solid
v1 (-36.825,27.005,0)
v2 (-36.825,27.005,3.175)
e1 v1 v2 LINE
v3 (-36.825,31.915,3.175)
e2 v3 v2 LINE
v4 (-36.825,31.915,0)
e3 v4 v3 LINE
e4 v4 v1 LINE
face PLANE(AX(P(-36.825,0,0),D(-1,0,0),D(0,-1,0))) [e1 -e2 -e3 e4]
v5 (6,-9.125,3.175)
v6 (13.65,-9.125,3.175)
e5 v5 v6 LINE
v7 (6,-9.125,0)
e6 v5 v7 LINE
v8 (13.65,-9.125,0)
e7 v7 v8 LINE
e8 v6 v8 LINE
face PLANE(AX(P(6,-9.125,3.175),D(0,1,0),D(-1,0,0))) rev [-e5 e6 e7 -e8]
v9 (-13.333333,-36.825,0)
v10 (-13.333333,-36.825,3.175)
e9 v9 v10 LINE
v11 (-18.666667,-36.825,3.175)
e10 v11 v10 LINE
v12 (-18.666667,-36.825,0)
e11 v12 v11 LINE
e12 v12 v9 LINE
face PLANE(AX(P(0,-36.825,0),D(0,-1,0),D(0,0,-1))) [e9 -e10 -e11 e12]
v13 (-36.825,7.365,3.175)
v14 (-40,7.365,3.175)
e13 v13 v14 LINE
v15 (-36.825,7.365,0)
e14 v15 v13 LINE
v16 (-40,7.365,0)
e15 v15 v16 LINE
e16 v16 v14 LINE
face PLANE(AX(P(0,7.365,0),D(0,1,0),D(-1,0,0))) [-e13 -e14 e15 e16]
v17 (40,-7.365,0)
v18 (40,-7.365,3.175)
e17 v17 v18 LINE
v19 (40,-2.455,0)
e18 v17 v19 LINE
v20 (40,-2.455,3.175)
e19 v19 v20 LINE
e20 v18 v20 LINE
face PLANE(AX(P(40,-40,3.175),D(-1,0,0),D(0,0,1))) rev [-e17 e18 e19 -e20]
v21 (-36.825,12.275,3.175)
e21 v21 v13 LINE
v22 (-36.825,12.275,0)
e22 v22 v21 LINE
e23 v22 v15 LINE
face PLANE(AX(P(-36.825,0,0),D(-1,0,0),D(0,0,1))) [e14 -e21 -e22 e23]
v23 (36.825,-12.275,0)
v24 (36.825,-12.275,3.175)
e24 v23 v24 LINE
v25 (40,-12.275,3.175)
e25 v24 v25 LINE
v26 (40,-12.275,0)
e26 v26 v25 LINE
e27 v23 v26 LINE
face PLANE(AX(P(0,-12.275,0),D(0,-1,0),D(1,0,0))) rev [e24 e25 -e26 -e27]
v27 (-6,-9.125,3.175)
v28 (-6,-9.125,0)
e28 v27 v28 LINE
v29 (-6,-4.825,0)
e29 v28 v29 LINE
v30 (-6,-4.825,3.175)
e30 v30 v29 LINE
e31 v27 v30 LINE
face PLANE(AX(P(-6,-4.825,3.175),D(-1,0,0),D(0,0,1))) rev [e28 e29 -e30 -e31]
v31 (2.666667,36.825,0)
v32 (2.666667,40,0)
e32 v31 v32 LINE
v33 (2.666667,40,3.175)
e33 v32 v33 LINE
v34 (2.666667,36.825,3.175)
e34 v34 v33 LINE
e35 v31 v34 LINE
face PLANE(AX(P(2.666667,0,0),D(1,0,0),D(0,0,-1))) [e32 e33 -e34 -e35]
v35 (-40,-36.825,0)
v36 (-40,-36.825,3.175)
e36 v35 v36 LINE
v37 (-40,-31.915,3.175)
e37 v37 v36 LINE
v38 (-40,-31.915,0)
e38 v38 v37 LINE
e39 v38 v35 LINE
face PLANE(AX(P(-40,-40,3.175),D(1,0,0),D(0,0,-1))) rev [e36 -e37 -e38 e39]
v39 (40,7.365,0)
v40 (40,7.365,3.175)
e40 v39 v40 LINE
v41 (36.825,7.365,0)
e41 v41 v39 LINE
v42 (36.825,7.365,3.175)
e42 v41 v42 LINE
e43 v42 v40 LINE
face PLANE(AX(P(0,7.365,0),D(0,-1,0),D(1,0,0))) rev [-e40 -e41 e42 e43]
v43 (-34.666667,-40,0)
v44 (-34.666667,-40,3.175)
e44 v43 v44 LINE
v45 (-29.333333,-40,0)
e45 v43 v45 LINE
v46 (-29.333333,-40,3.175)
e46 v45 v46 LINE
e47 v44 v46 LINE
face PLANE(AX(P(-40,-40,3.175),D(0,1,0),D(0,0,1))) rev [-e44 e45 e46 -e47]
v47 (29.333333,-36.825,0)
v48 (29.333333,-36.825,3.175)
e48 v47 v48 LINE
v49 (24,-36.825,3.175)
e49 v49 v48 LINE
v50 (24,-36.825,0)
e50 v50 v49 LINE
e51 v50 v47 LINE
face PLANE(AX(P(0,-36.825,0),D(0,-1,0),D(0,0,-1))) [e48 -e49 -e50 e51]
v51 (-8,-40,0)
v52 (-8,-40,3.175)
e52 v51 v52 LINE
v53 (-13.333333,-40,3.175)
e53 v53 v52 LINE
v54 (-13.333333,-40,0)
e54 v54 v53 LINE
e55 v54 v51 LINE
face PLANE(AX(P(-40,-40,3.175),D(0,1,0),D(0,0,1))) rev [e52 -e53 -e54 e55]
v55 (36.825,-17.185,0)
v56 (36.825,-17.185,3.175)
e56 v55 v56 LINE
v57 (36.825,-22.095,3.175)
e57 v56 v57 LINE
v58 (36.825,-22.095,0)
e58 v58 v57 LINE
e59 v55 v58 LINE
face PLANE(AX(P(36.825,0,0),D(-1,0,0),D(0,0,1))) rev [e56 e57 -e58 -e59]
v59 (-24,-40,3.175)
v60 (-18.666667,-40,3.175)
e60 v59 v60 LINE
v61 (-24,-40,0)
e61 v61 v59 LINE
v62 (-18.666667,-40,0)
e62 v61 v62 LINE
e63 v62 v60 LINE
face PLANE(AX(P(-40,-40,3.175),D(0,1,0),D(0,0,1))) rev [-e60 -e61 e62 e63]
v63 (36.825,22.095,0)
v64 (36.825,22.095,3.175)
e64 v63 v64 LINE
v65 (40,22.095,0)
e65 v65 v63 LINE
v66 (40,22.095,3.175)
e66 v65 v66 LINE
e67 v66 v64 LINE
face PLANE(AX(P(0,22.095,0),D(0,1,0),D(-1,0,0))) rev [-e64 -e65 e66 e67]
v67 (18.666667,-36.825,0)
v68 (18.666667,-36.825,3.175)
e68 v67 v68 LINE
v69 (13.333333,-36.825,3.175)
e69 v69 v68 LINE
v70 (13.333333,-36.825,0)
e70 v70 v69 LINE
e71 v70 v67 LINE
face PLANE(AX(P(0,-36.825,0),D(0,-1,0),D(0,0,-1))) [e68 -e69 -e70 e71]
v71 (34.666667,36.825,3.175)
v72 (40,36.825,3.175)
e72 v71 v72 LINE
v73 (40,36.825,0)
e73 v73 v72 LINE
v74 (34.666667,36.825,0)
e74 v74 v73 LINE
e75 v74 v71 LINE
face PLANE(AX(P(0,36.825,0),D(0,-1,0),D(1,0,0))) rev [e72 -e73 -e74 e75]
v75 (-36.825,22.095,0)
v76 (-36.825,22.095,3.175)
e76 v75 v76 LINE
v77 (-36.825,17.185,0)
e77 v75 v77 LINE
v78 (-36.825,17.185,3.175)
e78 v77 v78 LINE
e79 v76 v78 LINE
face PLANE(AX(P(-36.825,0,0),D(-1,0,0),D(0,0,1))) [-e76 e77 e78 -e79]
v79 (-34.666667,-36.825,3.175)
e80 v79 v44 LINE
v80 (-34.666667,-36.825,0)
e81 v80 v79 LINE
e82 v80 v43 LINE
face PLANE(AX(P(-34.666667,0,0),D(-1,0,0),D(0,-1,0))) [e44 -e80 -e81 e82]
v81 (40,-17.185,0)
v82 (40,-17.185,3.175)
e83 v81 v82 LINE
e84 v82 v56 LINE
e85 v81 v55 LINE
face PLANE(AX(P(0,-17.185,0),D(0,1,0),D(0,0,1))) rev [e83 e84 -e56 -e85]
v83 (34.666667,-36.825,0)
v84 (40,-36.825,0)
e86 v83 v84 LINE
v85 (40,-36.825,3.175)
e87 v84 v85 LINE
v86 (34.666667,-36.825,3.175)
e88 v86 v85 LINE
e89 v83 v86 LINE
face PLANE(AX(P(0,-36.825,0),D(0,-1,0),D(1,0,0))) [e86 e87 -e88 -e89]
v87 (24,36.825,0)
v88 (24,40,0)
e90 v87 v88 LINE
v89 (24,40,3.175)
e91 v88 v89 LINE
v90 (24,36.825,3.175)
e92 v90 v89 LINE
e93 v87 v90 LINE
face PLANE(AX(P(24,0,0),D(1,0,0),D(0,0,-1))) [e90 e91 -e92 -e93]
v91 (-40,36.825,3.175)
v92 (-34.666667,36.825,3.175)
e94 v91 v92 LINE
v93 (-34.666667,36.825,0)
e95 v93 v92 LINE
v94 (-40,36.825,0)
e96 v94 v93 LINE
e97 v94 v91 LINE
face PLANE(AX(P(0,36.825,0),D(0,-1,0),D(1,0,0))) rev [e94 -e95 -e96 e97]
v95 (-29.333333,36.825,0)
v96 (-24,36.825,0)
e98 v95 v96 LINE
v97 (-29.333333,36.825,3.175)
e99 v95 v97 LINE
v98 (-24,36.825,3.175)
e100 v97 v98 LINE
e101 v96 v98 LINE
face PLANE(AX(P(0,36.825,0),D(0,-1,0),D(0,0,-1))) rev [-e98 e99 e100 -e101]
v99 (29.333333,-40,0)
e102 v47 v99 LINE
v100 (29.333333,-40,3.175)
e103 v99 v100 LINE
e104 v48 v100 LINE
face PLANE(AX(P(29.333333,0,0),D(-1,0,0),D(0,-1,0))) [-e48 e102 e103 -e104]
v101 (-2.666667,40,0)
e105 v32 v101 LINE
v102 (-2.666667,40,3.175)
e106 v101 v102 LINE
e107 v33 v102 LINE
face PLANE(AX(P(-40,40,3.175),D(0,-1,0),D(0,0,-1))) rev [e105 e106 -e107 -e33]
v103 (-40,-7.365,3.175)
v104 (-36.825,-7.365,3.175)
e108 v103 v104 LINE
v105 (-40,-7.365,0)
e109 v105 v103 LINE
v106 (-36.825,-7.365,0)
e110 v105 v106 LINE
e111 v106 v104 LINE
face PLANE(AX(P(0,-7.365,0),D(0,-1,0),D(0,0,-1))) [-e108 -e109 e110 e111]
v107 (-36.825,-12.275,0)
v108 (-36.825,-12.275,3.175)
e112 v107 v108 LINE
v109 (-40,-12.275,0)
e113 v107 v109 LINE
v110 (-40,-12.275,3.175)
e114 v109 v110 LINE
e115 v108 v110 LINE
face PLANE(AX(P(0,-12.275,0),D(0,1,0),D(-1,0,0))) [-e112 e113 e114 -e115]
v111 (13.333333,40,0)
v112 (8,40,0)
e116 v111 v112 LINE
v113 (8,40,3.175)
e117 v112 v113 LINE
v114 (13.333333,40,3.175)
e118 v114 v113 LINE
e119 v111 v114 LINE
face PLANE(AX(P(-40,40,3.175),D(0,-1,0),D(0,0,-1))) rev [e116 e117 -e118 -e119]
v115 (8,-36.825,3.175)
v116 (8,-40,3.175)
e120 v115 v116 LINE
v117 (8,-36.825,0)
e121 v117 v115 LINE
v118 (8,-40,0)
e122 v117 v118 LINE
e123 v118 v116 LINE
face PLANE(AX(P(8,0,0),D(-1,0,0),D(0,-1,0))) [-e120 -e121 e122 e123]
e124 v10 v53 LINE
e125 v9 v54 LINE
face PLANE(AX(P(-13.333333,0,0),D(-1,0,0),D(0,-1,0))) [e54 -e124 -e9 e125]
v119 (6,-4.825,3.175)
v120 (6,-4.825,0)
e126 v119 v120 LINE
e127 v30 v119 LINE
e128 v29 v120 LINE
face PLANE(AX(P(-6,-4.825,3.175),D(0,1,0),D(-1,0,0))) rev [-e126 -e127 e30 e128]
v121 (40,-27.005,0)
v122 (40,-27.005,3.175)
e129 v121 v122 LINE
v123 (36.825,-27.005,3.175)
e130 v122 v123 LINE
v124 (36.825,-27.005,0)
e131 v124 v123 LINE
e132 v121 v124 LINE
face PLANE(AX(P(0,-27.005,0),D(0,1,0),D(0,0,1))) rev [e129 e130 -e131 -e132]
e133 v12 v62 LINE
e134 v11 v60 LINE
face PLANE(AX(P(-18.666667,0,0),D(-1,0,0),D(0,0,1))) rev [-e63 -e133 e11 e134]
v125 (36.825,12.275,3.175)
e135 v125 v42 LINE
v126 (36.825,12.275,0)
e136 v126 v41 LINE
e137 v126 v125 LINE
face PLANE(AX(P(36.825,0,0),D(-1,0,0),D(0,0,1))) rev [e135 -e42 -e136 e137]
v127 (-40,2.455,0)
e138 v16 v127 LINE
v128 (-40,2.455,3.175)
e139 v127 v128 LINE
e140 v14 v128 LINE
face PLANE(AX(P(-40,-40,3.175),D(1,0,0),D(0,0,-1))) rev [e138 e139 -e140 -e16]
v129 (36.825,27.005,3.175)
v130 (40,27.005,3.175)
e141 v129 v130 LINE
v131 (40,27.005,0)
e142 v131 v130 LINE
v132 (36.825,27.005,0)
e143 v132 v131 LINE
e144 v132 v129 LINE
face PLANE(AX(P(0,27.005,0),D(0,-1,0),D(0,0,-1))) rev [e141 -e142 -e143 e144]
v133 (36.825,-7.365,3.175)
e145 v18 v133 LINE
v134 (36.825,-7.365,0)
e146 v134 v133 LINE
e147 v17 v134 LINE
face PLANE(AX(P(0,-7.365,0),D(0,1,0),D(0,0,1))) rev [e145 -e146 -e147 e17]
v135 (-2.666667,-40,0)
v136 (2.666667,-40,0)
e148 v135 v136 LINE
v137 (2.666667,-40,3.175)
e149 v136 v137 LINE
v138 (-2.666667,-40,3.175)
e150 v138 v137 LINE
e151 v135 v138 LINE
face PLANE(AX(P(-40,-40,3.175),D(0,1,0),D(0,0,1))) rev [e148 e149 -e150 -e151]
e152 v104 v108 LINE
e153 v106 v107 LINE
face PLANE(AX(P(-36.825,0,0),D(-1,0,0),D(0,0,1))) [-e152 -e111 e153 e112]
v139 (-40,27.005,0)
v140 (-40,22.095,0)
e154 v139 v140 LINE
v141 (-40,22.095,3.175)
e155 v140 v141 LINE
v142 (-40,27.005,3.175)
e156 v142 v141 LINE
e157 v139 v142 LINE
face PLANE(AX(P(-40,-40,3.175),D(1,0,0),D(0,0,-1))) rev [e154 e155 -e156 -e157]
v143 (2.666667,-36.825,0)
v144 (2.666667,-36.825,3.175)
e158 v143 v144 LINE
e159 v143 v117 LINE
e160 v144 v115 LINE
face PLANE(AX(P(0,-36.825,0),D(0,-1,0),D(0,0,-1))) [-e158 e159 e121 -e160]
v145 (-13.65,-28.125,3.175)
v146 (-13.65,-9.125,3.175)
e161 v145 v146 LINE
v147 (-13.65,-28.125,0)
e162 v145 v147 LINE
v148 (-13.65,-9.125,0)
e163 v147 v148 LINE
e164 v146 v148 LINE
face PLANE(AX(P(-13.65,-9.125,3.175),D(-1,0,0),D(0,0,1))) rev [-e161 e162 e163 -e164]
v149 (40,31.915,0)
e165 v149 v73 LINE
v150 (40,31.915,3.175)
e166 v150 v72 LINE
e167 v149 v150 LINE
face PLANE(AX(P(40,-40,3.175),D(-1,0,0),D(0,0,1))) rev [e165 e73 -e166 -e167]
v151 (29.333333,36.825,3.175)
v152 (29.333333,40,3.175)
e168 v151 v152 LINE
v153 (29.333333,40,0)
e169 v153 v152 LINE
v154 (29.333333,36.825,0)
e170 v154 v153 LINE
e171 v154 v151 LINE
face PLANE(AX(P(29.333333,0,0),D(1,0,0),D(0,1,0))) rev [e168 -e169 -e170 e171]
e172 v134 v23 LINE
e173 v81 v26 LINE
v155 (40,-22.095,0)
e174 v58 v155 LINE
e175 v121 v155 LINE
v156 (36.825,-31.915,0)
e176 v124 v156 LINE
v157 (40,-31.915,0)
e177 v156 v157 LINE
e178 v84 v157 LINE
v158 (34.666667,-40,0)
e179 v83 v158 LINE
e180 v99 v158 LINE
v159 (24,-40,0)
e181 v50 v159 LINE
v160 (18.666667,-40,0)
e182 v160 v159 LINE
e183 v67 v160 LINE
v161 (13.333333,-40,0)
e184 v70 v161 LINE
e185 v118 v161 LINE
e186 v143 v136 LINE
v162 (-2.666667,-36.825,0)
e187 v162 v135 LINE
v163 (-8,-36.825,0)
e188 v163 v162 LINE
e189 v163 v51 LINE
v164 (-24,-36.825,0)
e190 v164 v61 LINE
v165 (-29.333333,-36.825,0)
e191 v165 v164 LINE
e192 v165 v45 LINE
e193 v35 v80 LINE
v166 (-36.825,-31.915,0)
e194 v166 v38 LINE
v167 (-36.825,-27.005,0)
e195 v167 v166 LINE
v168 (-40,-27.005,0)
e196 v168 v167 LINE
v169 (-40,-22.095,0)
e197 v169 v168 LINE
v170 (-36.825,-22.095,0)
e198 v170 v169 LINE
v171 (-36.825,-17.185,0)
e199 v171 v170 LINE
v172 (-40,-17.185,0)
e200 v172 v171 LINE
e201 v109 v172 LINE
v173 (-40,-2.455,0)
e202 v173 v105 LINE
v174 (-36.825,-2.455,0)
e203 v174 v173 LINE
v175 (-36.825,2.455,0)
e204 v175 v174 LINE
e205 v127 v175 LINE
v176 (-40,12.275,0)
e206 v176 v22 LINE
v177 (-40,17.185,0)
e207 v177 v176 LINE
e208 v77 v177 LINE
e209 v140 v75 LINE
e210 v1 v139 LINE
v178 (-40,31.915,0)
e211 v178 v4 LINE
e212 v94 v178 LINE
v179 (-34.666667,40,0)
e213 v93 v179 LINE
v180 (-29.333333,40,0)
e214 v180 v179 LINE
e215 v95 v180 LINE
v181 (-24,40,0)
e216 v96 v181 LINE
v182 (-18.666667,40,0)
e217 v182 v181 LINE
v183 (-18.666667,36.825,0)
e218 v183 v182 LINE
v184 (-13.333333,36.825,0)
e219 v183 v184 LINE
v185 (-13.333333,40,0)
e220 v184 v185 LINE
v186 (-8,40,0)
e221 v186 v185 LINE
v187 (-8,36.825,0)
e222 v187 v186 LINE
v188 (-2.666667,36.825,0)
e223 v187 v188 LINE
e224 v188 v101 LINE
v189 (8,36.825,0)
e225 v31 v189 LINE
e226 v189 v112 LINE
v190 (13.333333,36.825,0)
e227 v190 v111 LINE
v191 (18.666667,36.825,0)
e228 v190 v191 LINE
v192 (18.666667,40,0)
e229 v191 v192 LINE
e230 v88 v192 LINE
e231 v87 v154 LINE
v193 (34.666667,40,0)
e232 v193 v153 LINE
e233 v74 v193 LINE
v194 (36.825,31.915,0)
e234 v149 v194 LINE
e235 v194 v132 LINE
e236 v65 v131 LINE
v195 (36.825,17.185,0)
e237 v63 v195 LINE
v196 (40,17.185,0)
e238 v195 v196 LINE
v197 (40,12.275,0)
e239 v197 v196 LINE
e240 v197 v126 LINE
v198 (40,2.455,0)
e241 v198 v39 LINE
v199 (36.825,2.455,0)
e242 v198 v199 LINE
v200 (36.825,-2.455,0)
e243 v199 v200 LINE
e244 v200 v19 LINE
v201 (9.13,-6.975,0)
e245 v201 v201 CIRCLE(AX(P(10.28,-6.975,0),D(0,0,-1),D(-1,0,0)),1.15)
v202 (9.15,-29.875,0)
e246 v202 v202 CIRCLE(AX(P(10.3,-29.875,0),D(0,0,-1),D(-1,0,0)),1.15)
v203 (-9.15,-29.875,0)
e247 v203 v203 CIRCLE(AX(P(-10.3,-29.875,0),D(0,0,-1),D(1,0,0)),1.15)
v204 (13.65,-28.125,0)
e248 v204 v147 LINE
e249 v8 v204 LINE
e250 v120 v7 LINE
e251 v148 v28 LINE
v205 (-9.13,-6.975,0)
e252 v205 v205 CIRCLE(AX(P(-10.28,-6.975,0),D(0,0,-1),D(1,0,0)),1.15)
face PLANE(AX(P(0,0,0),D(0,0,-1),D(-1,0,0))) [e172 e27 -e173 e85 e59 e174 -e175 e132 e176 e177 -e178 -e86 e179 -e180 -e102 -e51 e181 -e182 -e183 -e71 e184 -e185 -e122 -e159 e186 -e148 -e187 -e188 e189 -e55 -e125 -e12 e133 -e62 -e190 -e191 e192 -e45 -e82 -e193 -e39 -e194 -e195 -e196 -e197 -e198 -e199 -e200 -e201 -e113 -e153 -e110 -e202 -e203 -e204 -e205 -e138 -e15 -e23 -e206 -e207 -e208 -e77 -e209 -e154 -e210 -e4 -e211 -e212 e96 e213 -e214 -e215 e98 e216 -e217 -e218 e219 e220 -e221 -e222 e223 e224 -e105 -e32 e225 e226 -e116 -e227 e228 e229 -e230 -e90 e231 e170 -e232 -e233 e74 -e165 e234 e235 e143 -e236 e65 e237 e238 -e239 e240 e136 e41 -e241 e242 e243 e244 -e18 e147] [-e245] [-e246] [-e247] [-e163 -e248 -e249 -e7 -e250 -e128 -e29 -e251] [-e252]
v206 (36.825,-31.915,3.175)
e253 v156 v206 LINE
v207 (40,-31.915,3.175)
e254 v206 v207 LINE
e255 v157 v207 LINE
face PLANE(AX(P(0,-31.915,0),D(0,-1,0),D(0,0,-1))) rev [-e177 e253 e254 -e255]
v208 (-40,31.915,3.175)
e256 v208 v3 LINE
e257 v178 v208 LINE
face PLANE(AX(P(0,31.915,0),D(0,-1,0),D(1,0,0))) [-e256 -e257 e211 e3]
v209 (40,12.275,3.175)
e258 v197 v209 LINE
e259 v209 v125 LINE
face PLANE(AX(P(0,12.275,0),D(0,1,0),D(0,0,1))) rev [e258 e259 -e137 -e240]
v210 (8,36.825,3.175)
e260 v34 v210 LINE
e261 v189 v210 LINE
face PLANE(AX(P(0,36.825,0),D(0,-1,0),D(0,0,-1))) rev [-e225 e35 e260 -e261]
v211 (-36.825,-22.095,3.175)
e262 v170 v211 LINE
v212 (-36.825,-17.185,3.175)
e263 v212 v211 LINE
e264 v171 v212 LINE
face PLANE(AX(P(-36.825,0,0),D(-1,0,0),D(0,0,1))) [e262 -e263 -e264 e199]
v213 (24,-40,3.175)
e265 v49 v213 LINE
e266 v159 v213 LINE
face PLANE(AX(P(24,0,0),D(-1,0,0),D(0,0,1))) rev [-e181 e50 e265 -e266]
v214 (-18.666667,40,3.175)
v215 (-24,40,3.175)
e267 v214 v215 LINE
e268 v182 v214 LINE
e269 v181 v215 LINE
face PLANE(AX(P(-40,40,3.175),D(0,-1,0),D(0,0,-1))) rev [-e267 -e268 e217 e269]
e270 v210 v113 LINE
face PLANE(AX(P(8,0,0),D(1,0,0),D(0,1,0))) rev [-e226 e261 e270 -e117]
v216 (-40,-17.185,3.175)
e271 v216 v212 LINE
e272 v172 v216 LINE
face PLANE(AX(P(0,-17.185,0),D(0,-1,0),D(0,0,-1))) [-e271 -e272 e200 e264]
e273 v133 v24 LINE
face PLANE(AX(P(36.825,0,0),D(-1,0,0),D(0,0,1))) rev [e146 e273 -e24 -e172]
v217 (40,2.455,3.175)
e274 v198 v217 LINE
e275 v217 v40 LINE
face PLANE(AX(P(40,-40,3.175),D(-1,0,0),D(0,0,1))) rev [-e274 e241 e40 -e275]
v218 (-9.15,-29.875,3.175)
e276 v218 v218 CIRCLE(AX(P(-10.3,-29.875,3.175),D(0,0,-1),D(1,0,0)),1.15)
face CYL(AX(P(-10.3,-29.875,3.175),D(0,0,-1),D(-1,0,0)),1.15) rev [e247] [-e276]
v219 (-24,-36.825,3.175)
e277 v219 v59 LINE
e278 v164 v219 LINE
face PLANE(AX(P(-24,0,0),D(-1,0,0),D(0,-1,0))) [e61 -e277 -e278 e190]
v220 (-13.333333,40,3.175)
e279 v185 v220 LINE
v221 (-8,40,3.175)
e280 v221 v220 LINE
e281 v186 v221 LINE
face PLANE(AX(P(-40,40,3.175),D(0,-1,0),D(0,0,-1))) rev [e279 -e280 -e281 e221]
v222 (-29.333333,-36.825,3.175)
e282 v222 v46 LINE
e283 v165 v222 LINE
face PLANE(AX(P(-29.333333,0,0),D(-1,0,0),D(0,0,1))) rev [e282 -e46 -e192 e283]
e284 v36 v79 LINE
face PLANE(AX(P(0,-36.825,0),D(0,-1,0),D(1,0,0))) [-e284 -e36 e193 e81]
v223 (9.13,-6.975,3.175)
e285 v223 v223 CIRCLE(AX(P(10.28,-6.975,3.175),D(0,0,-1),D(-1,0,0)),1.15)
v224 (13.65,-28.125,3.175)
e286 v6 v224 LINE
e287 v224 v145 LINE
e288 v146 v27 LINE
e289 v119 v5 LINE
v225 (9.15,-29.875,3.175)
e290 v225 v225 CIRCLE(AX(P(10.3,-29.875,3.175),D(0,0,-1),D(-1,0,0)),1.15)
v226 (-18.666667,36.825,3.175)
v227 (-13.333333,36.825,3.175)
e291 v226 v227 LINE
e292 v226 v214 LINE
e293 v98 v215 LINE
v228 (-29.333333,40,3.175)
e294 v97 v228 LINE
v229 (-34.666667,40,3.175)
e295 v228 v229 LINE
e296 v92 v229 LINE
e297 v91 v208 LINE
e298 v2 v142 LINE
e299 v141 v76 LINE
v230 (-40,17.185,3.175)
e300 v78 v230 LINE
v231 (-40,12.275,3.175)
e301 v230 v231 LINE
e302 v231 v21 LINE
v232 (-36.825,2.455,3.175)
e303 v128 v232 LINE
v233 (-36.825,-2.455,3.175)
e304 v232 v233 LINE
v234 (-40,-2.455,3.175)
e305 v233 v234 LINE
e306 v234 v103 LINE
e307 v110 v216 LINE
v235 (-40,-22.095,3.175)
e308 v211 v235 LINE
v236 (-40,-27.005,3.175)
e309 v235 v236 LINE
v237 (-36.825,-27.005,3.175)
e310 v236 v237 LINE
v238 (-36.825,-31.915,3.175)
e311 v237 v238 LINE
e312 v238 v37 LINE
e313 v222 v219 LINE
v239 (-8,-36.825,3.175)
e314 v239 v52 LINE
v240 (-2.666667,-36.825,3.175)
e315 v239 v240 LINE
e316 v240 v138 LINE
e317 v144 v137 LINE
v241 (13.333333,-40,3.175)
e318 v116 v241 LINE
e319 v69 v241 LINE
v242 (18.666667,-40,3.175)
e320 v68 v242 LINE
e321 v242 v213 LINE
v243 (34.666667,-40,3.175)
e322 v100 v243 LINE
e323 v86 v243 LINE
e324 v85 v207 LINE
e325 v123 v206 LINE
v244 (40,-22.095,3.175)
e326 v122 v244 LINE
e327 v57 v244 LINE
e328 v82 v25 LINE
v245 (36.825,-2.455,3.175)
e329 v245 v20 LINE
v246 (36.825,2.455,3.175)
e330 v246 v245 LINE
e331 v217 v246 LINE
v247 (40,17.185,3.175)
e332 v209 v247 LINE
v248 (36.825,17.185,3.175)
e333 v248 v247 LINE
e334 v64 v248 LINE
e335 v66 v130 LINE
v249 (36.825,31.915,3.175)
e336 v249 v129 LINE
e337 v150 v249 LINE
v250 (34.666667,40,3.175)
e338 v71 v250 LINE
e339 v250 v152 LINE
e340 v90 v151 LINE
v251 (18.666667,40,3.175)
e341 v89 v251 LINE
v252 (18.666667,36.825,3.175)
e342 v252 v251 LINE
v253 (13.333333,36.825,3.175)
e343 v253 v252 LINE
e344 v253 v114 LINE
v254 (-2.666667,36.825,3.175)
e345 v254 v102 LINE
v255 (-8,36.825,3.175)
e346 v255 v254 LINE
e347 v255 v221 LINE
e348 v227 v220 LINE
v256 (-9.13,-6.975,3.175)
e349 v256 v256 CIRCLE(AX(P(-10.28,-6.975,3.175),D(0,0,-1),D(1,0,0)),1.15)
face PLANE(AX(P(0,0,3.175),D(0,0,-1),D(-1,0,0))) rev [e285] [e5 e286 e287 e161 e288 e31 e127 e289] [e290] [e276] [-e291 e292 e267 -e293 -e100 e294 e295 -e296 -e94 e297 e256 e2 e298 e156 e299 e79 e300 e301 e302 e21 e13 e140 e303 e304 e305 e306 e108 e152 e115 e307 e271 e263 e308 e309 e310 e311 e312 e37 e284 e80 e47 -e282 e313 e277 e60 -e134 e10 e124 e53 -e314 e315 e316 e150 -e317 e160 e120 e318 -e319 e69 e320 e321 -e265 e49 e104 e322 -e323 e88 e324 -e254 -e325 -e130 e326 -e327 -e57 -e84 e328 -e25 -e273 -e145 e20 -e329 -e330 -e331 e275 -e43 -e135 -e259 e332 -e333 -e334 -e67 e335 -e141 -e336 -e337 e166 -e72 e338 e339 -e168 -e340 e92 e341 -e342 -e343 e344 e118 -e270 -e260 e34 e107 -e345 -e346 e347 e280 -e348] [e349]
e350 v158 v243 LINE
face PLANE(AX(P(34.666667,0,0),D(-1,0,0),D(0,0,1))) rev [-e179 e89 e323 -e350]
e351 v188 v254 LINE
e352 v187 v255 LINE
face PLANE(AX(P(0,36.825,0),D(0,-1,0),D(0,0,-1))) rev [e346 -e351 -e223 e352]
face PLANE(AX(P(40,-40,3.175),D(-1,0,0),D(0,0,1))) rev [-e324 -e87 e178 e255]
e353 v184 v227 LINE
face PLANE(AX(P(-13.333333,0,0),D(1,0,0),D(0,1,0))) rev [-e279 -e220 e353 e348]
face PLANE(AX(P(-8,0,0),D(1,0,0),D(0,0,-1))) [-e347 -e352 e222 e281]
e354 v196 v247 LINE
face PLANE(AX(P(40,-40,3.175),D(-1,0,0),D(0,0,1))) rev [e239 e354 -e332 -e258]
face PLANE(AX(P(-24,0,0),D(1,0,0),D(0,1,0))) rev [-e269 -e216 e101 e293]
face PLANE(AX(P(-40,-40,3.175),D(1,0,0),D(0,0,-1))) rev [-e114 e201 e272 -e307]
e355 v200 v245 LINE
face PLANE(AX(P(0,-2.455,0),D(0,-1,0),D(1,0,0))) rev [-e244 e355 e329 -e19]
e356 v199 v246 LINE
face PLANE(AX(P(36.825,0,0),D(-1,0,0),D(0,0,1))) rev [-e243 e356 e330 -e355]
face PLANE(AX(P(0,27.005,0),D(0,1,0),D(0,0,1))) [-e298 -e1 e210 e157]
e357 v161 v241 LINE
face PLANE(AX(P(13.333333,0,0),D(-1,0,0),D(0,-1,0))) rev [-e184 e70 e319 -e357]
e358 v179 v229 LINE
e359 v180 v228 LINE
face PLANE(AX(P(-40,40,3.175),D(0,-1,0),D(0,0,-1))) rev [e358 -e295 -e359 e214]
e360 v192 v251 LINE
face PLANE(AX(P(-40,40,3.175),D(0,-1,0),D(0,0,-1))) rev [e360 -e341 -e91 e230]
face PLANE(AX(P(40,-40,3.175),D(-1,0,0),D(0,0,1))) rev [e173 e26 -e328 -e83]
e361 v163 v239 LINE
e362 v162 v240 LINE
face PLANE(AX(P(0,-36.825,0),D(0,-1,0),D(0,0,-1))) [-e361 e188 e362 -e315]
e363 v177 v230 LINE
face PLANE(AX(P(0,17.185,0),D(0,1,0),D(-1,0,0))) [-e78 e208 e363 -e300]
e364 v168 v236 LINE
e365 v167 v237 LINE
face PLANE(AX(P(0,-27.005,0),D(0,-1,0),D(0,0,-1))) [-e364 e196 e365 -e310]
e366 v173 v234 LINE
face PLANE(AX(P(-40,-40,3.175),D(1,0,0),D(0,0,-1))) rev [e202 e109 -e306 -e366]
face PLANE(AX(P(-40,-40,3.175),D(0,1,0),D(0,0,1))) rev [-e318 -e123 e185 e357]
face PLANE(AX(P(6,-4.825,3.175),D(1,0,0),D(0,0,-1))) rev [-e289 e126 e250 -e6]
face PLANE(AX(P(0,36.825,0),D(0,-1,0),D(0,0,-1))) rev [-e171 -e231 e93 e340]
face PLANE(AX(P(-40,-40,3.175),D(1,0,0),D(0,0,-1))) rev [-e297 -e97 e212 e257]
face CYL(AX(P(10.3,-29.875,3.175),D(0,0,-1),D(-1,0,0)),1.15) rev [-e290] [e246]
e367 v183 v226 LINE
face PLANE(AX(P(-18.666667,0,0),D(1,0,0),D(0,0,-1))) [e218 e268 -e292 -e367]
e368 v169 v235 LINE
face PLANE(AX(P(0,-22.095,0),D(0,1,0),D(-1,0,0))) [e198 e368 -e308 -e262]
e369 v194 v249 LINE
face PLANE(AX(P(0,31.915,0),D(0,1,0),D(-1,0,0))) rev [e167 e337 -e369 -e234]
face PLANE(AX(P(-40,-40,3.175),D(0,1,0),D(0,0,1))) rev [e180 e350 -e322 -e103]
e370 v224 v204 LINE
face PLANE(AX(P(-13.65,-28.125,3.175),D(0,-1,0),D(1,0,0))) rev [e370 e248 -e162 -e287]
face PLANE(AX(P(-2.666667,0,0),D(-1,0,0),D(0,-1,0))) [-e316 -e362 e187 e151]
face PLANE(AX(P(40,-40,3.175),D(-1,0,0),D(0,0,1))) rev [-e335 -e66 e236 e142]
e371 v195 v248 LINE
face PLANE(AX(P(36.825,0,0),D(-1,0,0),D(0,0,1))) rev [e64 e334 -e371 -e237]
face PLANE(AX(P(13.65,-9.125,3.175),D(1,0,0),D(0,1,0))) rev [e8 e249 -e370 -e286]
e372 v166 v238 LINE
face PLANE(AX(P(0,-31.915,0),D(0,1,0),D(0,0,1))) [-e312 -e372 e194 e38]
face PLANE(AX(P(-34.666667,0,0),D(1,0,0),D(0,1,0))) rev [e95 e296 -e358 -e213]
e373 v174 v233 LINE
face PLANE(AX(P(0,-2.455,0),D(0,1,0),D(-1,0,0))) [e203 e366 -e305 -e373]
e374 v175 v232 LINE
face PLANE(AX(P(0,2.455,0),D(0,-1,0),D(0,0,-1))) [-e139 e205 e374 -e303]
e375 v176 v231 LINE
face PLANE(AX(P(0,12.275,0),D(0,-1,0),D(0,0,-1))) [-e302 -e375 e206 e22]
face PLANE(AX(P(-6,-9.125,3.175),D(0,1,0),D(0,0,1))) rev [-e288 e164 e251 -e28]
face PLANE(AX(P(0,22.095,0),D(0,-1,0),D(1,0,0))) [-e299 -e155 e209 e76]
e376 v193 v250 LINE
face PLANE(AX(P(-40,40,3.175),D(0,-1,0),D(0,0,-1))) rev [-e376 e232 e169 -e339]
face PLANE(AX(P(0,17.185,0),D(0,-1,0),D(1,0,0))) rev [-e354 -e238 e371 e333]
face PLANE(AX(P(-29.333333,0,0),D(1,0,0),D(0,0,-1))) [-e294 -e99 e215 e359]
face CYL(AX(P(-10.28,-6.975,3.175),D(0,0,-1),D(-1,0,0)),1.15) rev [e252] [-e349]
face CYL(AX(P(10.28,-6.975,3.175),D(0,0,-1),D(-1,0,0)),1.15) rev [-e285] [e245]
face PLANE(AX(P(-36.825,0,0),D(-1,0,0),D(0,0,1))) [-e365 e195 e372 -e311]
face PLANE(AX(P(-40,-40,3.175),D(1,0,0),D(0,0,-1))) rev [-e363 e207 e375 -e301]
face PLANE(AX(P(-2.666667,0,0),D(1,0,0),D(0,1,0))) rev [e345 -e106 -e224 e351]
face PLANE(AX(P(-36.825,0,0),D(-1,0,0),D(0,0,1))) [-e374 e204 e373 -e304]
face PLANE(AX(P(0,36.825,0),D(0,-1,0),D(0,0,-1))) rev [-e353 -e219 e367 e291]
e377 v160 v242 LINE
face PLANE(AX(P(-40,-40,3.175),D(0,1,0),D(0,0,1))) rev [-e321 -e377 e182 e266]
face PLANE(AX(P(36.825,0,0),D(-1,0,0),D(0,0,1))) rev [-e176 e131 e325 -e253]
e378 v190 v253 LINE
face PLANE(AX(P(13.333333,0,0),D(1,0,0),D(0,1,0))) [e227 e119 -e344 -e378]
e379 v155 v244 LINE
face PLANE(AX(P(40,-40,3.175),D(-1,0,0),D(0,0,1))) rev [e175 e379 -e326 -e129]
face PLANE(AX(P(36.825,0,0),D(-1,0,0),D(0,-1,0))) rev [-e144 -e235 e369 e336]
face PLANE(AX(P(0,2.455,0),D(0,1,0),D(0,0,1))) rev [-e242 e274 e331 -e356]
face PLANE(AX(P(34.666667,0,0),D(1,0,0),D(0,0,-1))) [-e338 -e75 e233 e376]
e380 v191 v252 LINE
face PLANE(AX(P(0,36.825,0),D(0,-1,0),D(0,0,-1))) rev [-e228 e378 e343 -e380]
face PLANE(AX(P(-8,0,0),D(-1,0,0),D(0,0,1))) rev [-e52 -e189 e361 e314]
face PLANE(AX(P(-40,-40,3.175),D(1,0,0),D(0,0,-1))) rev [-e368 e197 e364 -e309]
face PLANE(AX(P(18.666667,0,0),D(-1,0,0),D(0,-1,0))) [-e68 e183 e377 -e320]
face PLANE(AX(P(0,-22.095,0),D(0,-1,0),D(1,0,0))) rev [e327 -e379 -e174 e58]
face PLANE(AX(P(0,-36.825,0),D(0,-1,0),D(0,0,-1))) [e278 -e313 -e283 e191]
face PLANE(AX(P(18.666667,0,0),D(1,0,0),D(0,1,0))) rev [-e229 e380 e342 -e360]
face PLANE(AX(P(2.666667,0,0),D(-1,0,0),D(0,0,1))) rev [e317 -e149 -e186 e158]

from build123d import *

# Parameters (mm, degrees)
SKETCH1_W           = 80
SKETCH1_H           = 80
BOSS_EXTRUDE1_DEPTH = 3.175
SKETCH2_OUTSIDE_W   = 104.636
SKETCH2_OUTSIDE_H   = 104.636
CUT_EXTRUDE1_DEPTH  = 57.657573413
SKETCH3_R           = 1.15
CUT_EXTRUDE2_DEPTH  = 57.657573413


with BuildPart() as part:
    # Sketch1 → Boss-Extrude1 (new body)
    with BuildSketch(Plane.XY):
        Rectangle(SKETCH1_W, SKETCH1_H)
    extrude(amount=BOSS_EXTRUDE1_DEPTH)

    # Sketch2 outside → Cut-Extrude1 (cut, through all)
    with BuildSketch(Plane.XY.offset(3.175)):
        Rectangle(SKETCH2_OUTSIDE_W, SKETCH2_OUTSIDE_H)
        Polygon((-40, -31.915), (-40, -36.825), (-34.666666667, -36.825), (-34.666666667, -40), (-29.333333333, -40), (-29.333333333, -36.825), (-24, -36.825), (-24, -40), (-18.666666667, -40), (-18.666666667, -36.825), (-13.333333333, -36.825), (-13.333333333, -40), (-8, -40), (-8, -36.825), (-2.666666667, -36.825), (-2.666666667, -40), (2.666666667, -40), (2.666666667, -36.825), (8, -36.825), (8, -40), (13.333333333, -40), (13.333333333, -36.825), (18.666666667, -36.825), (18.666666667, -40), (24, -40), (24, -36.825), (29.333333333, -36.825), (29.333333333, -40), (34.666666667, -40), (34.666666667, -36.825), (40, -36.825), (40, -31.915), (36.825, -31.915), (36.825, -27.005), (40, -27.005), (40, -22.095), (36.825, -22.095), (36.825, -17.185), (40, -17.185), (40, -12.275), (36.825, -12.275), (36.825, -7.365), (40, -7.365), (40, -2.455), (36.825, -2.455), (36.825, 2.455), (40, 2.455), (40, 7.365), (36.825, 7.365), (36.825, 12.275), (40, 12.275), (40, 17.185), (36.825, 17.185), (36.825, 22.095), (40, 22.095), (40, 27.005), (36.825, 27.005), (36.825, 31.915), (40, 31.915), (40, 36.825), (34.666666667, 36.825), (34.666666667, 40), (29.333333333, 40), (29.333333333, 36.825), (24, 36.825), (24, 40), (18.666666667, 40), (18.666666667, 36.825), (13.333333333, 36.825), (13.333333333, 40), (8, 40), (8, 36.825), (2.666666667, 36.825), (2.666666667, 40), (-2.666666667, 40), (-2.666666667, 36.825), (-8, 36.825), (-8, 40), (-13.333333333, 40), (-13.333333333, 36.825), (-18.666666667, 36.825), (-18.666666667, 40), (-24, 40), (-24, 36.825), (-29.333333333, 36.825), (-29.333333333, 40), (-34.666666667, 40), (-34.666666667, 36.825), (-40, 36.825), (-40, 31.915), (-36.825, 31.915), (-36.825, 27.005), (-40, 27.005), (-40, 22.095), (-36.825, 22.095), (-36.825, 17.185), (-40, 17.185), (-40, 12.275), (-36.825, 12.275), (-36.825, 7.365), (-40, 7.365), (-40, 2.455), (-36.825, 2.455), (-36.825, -2.455), (-40, -2.455), (-40, -7.365), (-36.825, -7.365), (-36.825, -12.275), (-40, -12.275), (-40, -17.185), (-36.825, -17.185), (-36.825, -22.095), (-40, -22.095), (-40, -27.005), (-36.825, -27.005), (-36.825, -31.915), align=None, mode=Mode.SUBTRACT)
    extrude(amount=-CUT_EXTRUDE1_DEPTH, mode=Mode.SUBTRACT)

    # Sketch3 → Cut-Extrude2 (cut, through all)
    with BuildSketch(Plane(origin=(0, 0, 0), x_dir=(-1, 0, 0), z_dir=(0, 0, -1))):
        with Locations((-10.28, -6.975)):
            Circle(SKETCH3_R)
        with Locations((-10.3, -29.875)):
            Circle(SKETCH3_R)
        with Locations((10.3, -29.875)):
            Circle(SKETCH3_R)
        with Locations((10.28, -6.975)):
            Circle(SKETCH3_R)
        Polygon((6, -4.825), (6, -9.125), (13.65, -9.125), (13.65, -28.125), (-13.65, -28.125), (-13.65, -9.125), (-6, -9.125), (-6, -4.825), align=None)
    extrude(amount=-CUT_EXTRUDE2_DEPTH, mode=Mode.SUBTRACT)


solid = part.part
